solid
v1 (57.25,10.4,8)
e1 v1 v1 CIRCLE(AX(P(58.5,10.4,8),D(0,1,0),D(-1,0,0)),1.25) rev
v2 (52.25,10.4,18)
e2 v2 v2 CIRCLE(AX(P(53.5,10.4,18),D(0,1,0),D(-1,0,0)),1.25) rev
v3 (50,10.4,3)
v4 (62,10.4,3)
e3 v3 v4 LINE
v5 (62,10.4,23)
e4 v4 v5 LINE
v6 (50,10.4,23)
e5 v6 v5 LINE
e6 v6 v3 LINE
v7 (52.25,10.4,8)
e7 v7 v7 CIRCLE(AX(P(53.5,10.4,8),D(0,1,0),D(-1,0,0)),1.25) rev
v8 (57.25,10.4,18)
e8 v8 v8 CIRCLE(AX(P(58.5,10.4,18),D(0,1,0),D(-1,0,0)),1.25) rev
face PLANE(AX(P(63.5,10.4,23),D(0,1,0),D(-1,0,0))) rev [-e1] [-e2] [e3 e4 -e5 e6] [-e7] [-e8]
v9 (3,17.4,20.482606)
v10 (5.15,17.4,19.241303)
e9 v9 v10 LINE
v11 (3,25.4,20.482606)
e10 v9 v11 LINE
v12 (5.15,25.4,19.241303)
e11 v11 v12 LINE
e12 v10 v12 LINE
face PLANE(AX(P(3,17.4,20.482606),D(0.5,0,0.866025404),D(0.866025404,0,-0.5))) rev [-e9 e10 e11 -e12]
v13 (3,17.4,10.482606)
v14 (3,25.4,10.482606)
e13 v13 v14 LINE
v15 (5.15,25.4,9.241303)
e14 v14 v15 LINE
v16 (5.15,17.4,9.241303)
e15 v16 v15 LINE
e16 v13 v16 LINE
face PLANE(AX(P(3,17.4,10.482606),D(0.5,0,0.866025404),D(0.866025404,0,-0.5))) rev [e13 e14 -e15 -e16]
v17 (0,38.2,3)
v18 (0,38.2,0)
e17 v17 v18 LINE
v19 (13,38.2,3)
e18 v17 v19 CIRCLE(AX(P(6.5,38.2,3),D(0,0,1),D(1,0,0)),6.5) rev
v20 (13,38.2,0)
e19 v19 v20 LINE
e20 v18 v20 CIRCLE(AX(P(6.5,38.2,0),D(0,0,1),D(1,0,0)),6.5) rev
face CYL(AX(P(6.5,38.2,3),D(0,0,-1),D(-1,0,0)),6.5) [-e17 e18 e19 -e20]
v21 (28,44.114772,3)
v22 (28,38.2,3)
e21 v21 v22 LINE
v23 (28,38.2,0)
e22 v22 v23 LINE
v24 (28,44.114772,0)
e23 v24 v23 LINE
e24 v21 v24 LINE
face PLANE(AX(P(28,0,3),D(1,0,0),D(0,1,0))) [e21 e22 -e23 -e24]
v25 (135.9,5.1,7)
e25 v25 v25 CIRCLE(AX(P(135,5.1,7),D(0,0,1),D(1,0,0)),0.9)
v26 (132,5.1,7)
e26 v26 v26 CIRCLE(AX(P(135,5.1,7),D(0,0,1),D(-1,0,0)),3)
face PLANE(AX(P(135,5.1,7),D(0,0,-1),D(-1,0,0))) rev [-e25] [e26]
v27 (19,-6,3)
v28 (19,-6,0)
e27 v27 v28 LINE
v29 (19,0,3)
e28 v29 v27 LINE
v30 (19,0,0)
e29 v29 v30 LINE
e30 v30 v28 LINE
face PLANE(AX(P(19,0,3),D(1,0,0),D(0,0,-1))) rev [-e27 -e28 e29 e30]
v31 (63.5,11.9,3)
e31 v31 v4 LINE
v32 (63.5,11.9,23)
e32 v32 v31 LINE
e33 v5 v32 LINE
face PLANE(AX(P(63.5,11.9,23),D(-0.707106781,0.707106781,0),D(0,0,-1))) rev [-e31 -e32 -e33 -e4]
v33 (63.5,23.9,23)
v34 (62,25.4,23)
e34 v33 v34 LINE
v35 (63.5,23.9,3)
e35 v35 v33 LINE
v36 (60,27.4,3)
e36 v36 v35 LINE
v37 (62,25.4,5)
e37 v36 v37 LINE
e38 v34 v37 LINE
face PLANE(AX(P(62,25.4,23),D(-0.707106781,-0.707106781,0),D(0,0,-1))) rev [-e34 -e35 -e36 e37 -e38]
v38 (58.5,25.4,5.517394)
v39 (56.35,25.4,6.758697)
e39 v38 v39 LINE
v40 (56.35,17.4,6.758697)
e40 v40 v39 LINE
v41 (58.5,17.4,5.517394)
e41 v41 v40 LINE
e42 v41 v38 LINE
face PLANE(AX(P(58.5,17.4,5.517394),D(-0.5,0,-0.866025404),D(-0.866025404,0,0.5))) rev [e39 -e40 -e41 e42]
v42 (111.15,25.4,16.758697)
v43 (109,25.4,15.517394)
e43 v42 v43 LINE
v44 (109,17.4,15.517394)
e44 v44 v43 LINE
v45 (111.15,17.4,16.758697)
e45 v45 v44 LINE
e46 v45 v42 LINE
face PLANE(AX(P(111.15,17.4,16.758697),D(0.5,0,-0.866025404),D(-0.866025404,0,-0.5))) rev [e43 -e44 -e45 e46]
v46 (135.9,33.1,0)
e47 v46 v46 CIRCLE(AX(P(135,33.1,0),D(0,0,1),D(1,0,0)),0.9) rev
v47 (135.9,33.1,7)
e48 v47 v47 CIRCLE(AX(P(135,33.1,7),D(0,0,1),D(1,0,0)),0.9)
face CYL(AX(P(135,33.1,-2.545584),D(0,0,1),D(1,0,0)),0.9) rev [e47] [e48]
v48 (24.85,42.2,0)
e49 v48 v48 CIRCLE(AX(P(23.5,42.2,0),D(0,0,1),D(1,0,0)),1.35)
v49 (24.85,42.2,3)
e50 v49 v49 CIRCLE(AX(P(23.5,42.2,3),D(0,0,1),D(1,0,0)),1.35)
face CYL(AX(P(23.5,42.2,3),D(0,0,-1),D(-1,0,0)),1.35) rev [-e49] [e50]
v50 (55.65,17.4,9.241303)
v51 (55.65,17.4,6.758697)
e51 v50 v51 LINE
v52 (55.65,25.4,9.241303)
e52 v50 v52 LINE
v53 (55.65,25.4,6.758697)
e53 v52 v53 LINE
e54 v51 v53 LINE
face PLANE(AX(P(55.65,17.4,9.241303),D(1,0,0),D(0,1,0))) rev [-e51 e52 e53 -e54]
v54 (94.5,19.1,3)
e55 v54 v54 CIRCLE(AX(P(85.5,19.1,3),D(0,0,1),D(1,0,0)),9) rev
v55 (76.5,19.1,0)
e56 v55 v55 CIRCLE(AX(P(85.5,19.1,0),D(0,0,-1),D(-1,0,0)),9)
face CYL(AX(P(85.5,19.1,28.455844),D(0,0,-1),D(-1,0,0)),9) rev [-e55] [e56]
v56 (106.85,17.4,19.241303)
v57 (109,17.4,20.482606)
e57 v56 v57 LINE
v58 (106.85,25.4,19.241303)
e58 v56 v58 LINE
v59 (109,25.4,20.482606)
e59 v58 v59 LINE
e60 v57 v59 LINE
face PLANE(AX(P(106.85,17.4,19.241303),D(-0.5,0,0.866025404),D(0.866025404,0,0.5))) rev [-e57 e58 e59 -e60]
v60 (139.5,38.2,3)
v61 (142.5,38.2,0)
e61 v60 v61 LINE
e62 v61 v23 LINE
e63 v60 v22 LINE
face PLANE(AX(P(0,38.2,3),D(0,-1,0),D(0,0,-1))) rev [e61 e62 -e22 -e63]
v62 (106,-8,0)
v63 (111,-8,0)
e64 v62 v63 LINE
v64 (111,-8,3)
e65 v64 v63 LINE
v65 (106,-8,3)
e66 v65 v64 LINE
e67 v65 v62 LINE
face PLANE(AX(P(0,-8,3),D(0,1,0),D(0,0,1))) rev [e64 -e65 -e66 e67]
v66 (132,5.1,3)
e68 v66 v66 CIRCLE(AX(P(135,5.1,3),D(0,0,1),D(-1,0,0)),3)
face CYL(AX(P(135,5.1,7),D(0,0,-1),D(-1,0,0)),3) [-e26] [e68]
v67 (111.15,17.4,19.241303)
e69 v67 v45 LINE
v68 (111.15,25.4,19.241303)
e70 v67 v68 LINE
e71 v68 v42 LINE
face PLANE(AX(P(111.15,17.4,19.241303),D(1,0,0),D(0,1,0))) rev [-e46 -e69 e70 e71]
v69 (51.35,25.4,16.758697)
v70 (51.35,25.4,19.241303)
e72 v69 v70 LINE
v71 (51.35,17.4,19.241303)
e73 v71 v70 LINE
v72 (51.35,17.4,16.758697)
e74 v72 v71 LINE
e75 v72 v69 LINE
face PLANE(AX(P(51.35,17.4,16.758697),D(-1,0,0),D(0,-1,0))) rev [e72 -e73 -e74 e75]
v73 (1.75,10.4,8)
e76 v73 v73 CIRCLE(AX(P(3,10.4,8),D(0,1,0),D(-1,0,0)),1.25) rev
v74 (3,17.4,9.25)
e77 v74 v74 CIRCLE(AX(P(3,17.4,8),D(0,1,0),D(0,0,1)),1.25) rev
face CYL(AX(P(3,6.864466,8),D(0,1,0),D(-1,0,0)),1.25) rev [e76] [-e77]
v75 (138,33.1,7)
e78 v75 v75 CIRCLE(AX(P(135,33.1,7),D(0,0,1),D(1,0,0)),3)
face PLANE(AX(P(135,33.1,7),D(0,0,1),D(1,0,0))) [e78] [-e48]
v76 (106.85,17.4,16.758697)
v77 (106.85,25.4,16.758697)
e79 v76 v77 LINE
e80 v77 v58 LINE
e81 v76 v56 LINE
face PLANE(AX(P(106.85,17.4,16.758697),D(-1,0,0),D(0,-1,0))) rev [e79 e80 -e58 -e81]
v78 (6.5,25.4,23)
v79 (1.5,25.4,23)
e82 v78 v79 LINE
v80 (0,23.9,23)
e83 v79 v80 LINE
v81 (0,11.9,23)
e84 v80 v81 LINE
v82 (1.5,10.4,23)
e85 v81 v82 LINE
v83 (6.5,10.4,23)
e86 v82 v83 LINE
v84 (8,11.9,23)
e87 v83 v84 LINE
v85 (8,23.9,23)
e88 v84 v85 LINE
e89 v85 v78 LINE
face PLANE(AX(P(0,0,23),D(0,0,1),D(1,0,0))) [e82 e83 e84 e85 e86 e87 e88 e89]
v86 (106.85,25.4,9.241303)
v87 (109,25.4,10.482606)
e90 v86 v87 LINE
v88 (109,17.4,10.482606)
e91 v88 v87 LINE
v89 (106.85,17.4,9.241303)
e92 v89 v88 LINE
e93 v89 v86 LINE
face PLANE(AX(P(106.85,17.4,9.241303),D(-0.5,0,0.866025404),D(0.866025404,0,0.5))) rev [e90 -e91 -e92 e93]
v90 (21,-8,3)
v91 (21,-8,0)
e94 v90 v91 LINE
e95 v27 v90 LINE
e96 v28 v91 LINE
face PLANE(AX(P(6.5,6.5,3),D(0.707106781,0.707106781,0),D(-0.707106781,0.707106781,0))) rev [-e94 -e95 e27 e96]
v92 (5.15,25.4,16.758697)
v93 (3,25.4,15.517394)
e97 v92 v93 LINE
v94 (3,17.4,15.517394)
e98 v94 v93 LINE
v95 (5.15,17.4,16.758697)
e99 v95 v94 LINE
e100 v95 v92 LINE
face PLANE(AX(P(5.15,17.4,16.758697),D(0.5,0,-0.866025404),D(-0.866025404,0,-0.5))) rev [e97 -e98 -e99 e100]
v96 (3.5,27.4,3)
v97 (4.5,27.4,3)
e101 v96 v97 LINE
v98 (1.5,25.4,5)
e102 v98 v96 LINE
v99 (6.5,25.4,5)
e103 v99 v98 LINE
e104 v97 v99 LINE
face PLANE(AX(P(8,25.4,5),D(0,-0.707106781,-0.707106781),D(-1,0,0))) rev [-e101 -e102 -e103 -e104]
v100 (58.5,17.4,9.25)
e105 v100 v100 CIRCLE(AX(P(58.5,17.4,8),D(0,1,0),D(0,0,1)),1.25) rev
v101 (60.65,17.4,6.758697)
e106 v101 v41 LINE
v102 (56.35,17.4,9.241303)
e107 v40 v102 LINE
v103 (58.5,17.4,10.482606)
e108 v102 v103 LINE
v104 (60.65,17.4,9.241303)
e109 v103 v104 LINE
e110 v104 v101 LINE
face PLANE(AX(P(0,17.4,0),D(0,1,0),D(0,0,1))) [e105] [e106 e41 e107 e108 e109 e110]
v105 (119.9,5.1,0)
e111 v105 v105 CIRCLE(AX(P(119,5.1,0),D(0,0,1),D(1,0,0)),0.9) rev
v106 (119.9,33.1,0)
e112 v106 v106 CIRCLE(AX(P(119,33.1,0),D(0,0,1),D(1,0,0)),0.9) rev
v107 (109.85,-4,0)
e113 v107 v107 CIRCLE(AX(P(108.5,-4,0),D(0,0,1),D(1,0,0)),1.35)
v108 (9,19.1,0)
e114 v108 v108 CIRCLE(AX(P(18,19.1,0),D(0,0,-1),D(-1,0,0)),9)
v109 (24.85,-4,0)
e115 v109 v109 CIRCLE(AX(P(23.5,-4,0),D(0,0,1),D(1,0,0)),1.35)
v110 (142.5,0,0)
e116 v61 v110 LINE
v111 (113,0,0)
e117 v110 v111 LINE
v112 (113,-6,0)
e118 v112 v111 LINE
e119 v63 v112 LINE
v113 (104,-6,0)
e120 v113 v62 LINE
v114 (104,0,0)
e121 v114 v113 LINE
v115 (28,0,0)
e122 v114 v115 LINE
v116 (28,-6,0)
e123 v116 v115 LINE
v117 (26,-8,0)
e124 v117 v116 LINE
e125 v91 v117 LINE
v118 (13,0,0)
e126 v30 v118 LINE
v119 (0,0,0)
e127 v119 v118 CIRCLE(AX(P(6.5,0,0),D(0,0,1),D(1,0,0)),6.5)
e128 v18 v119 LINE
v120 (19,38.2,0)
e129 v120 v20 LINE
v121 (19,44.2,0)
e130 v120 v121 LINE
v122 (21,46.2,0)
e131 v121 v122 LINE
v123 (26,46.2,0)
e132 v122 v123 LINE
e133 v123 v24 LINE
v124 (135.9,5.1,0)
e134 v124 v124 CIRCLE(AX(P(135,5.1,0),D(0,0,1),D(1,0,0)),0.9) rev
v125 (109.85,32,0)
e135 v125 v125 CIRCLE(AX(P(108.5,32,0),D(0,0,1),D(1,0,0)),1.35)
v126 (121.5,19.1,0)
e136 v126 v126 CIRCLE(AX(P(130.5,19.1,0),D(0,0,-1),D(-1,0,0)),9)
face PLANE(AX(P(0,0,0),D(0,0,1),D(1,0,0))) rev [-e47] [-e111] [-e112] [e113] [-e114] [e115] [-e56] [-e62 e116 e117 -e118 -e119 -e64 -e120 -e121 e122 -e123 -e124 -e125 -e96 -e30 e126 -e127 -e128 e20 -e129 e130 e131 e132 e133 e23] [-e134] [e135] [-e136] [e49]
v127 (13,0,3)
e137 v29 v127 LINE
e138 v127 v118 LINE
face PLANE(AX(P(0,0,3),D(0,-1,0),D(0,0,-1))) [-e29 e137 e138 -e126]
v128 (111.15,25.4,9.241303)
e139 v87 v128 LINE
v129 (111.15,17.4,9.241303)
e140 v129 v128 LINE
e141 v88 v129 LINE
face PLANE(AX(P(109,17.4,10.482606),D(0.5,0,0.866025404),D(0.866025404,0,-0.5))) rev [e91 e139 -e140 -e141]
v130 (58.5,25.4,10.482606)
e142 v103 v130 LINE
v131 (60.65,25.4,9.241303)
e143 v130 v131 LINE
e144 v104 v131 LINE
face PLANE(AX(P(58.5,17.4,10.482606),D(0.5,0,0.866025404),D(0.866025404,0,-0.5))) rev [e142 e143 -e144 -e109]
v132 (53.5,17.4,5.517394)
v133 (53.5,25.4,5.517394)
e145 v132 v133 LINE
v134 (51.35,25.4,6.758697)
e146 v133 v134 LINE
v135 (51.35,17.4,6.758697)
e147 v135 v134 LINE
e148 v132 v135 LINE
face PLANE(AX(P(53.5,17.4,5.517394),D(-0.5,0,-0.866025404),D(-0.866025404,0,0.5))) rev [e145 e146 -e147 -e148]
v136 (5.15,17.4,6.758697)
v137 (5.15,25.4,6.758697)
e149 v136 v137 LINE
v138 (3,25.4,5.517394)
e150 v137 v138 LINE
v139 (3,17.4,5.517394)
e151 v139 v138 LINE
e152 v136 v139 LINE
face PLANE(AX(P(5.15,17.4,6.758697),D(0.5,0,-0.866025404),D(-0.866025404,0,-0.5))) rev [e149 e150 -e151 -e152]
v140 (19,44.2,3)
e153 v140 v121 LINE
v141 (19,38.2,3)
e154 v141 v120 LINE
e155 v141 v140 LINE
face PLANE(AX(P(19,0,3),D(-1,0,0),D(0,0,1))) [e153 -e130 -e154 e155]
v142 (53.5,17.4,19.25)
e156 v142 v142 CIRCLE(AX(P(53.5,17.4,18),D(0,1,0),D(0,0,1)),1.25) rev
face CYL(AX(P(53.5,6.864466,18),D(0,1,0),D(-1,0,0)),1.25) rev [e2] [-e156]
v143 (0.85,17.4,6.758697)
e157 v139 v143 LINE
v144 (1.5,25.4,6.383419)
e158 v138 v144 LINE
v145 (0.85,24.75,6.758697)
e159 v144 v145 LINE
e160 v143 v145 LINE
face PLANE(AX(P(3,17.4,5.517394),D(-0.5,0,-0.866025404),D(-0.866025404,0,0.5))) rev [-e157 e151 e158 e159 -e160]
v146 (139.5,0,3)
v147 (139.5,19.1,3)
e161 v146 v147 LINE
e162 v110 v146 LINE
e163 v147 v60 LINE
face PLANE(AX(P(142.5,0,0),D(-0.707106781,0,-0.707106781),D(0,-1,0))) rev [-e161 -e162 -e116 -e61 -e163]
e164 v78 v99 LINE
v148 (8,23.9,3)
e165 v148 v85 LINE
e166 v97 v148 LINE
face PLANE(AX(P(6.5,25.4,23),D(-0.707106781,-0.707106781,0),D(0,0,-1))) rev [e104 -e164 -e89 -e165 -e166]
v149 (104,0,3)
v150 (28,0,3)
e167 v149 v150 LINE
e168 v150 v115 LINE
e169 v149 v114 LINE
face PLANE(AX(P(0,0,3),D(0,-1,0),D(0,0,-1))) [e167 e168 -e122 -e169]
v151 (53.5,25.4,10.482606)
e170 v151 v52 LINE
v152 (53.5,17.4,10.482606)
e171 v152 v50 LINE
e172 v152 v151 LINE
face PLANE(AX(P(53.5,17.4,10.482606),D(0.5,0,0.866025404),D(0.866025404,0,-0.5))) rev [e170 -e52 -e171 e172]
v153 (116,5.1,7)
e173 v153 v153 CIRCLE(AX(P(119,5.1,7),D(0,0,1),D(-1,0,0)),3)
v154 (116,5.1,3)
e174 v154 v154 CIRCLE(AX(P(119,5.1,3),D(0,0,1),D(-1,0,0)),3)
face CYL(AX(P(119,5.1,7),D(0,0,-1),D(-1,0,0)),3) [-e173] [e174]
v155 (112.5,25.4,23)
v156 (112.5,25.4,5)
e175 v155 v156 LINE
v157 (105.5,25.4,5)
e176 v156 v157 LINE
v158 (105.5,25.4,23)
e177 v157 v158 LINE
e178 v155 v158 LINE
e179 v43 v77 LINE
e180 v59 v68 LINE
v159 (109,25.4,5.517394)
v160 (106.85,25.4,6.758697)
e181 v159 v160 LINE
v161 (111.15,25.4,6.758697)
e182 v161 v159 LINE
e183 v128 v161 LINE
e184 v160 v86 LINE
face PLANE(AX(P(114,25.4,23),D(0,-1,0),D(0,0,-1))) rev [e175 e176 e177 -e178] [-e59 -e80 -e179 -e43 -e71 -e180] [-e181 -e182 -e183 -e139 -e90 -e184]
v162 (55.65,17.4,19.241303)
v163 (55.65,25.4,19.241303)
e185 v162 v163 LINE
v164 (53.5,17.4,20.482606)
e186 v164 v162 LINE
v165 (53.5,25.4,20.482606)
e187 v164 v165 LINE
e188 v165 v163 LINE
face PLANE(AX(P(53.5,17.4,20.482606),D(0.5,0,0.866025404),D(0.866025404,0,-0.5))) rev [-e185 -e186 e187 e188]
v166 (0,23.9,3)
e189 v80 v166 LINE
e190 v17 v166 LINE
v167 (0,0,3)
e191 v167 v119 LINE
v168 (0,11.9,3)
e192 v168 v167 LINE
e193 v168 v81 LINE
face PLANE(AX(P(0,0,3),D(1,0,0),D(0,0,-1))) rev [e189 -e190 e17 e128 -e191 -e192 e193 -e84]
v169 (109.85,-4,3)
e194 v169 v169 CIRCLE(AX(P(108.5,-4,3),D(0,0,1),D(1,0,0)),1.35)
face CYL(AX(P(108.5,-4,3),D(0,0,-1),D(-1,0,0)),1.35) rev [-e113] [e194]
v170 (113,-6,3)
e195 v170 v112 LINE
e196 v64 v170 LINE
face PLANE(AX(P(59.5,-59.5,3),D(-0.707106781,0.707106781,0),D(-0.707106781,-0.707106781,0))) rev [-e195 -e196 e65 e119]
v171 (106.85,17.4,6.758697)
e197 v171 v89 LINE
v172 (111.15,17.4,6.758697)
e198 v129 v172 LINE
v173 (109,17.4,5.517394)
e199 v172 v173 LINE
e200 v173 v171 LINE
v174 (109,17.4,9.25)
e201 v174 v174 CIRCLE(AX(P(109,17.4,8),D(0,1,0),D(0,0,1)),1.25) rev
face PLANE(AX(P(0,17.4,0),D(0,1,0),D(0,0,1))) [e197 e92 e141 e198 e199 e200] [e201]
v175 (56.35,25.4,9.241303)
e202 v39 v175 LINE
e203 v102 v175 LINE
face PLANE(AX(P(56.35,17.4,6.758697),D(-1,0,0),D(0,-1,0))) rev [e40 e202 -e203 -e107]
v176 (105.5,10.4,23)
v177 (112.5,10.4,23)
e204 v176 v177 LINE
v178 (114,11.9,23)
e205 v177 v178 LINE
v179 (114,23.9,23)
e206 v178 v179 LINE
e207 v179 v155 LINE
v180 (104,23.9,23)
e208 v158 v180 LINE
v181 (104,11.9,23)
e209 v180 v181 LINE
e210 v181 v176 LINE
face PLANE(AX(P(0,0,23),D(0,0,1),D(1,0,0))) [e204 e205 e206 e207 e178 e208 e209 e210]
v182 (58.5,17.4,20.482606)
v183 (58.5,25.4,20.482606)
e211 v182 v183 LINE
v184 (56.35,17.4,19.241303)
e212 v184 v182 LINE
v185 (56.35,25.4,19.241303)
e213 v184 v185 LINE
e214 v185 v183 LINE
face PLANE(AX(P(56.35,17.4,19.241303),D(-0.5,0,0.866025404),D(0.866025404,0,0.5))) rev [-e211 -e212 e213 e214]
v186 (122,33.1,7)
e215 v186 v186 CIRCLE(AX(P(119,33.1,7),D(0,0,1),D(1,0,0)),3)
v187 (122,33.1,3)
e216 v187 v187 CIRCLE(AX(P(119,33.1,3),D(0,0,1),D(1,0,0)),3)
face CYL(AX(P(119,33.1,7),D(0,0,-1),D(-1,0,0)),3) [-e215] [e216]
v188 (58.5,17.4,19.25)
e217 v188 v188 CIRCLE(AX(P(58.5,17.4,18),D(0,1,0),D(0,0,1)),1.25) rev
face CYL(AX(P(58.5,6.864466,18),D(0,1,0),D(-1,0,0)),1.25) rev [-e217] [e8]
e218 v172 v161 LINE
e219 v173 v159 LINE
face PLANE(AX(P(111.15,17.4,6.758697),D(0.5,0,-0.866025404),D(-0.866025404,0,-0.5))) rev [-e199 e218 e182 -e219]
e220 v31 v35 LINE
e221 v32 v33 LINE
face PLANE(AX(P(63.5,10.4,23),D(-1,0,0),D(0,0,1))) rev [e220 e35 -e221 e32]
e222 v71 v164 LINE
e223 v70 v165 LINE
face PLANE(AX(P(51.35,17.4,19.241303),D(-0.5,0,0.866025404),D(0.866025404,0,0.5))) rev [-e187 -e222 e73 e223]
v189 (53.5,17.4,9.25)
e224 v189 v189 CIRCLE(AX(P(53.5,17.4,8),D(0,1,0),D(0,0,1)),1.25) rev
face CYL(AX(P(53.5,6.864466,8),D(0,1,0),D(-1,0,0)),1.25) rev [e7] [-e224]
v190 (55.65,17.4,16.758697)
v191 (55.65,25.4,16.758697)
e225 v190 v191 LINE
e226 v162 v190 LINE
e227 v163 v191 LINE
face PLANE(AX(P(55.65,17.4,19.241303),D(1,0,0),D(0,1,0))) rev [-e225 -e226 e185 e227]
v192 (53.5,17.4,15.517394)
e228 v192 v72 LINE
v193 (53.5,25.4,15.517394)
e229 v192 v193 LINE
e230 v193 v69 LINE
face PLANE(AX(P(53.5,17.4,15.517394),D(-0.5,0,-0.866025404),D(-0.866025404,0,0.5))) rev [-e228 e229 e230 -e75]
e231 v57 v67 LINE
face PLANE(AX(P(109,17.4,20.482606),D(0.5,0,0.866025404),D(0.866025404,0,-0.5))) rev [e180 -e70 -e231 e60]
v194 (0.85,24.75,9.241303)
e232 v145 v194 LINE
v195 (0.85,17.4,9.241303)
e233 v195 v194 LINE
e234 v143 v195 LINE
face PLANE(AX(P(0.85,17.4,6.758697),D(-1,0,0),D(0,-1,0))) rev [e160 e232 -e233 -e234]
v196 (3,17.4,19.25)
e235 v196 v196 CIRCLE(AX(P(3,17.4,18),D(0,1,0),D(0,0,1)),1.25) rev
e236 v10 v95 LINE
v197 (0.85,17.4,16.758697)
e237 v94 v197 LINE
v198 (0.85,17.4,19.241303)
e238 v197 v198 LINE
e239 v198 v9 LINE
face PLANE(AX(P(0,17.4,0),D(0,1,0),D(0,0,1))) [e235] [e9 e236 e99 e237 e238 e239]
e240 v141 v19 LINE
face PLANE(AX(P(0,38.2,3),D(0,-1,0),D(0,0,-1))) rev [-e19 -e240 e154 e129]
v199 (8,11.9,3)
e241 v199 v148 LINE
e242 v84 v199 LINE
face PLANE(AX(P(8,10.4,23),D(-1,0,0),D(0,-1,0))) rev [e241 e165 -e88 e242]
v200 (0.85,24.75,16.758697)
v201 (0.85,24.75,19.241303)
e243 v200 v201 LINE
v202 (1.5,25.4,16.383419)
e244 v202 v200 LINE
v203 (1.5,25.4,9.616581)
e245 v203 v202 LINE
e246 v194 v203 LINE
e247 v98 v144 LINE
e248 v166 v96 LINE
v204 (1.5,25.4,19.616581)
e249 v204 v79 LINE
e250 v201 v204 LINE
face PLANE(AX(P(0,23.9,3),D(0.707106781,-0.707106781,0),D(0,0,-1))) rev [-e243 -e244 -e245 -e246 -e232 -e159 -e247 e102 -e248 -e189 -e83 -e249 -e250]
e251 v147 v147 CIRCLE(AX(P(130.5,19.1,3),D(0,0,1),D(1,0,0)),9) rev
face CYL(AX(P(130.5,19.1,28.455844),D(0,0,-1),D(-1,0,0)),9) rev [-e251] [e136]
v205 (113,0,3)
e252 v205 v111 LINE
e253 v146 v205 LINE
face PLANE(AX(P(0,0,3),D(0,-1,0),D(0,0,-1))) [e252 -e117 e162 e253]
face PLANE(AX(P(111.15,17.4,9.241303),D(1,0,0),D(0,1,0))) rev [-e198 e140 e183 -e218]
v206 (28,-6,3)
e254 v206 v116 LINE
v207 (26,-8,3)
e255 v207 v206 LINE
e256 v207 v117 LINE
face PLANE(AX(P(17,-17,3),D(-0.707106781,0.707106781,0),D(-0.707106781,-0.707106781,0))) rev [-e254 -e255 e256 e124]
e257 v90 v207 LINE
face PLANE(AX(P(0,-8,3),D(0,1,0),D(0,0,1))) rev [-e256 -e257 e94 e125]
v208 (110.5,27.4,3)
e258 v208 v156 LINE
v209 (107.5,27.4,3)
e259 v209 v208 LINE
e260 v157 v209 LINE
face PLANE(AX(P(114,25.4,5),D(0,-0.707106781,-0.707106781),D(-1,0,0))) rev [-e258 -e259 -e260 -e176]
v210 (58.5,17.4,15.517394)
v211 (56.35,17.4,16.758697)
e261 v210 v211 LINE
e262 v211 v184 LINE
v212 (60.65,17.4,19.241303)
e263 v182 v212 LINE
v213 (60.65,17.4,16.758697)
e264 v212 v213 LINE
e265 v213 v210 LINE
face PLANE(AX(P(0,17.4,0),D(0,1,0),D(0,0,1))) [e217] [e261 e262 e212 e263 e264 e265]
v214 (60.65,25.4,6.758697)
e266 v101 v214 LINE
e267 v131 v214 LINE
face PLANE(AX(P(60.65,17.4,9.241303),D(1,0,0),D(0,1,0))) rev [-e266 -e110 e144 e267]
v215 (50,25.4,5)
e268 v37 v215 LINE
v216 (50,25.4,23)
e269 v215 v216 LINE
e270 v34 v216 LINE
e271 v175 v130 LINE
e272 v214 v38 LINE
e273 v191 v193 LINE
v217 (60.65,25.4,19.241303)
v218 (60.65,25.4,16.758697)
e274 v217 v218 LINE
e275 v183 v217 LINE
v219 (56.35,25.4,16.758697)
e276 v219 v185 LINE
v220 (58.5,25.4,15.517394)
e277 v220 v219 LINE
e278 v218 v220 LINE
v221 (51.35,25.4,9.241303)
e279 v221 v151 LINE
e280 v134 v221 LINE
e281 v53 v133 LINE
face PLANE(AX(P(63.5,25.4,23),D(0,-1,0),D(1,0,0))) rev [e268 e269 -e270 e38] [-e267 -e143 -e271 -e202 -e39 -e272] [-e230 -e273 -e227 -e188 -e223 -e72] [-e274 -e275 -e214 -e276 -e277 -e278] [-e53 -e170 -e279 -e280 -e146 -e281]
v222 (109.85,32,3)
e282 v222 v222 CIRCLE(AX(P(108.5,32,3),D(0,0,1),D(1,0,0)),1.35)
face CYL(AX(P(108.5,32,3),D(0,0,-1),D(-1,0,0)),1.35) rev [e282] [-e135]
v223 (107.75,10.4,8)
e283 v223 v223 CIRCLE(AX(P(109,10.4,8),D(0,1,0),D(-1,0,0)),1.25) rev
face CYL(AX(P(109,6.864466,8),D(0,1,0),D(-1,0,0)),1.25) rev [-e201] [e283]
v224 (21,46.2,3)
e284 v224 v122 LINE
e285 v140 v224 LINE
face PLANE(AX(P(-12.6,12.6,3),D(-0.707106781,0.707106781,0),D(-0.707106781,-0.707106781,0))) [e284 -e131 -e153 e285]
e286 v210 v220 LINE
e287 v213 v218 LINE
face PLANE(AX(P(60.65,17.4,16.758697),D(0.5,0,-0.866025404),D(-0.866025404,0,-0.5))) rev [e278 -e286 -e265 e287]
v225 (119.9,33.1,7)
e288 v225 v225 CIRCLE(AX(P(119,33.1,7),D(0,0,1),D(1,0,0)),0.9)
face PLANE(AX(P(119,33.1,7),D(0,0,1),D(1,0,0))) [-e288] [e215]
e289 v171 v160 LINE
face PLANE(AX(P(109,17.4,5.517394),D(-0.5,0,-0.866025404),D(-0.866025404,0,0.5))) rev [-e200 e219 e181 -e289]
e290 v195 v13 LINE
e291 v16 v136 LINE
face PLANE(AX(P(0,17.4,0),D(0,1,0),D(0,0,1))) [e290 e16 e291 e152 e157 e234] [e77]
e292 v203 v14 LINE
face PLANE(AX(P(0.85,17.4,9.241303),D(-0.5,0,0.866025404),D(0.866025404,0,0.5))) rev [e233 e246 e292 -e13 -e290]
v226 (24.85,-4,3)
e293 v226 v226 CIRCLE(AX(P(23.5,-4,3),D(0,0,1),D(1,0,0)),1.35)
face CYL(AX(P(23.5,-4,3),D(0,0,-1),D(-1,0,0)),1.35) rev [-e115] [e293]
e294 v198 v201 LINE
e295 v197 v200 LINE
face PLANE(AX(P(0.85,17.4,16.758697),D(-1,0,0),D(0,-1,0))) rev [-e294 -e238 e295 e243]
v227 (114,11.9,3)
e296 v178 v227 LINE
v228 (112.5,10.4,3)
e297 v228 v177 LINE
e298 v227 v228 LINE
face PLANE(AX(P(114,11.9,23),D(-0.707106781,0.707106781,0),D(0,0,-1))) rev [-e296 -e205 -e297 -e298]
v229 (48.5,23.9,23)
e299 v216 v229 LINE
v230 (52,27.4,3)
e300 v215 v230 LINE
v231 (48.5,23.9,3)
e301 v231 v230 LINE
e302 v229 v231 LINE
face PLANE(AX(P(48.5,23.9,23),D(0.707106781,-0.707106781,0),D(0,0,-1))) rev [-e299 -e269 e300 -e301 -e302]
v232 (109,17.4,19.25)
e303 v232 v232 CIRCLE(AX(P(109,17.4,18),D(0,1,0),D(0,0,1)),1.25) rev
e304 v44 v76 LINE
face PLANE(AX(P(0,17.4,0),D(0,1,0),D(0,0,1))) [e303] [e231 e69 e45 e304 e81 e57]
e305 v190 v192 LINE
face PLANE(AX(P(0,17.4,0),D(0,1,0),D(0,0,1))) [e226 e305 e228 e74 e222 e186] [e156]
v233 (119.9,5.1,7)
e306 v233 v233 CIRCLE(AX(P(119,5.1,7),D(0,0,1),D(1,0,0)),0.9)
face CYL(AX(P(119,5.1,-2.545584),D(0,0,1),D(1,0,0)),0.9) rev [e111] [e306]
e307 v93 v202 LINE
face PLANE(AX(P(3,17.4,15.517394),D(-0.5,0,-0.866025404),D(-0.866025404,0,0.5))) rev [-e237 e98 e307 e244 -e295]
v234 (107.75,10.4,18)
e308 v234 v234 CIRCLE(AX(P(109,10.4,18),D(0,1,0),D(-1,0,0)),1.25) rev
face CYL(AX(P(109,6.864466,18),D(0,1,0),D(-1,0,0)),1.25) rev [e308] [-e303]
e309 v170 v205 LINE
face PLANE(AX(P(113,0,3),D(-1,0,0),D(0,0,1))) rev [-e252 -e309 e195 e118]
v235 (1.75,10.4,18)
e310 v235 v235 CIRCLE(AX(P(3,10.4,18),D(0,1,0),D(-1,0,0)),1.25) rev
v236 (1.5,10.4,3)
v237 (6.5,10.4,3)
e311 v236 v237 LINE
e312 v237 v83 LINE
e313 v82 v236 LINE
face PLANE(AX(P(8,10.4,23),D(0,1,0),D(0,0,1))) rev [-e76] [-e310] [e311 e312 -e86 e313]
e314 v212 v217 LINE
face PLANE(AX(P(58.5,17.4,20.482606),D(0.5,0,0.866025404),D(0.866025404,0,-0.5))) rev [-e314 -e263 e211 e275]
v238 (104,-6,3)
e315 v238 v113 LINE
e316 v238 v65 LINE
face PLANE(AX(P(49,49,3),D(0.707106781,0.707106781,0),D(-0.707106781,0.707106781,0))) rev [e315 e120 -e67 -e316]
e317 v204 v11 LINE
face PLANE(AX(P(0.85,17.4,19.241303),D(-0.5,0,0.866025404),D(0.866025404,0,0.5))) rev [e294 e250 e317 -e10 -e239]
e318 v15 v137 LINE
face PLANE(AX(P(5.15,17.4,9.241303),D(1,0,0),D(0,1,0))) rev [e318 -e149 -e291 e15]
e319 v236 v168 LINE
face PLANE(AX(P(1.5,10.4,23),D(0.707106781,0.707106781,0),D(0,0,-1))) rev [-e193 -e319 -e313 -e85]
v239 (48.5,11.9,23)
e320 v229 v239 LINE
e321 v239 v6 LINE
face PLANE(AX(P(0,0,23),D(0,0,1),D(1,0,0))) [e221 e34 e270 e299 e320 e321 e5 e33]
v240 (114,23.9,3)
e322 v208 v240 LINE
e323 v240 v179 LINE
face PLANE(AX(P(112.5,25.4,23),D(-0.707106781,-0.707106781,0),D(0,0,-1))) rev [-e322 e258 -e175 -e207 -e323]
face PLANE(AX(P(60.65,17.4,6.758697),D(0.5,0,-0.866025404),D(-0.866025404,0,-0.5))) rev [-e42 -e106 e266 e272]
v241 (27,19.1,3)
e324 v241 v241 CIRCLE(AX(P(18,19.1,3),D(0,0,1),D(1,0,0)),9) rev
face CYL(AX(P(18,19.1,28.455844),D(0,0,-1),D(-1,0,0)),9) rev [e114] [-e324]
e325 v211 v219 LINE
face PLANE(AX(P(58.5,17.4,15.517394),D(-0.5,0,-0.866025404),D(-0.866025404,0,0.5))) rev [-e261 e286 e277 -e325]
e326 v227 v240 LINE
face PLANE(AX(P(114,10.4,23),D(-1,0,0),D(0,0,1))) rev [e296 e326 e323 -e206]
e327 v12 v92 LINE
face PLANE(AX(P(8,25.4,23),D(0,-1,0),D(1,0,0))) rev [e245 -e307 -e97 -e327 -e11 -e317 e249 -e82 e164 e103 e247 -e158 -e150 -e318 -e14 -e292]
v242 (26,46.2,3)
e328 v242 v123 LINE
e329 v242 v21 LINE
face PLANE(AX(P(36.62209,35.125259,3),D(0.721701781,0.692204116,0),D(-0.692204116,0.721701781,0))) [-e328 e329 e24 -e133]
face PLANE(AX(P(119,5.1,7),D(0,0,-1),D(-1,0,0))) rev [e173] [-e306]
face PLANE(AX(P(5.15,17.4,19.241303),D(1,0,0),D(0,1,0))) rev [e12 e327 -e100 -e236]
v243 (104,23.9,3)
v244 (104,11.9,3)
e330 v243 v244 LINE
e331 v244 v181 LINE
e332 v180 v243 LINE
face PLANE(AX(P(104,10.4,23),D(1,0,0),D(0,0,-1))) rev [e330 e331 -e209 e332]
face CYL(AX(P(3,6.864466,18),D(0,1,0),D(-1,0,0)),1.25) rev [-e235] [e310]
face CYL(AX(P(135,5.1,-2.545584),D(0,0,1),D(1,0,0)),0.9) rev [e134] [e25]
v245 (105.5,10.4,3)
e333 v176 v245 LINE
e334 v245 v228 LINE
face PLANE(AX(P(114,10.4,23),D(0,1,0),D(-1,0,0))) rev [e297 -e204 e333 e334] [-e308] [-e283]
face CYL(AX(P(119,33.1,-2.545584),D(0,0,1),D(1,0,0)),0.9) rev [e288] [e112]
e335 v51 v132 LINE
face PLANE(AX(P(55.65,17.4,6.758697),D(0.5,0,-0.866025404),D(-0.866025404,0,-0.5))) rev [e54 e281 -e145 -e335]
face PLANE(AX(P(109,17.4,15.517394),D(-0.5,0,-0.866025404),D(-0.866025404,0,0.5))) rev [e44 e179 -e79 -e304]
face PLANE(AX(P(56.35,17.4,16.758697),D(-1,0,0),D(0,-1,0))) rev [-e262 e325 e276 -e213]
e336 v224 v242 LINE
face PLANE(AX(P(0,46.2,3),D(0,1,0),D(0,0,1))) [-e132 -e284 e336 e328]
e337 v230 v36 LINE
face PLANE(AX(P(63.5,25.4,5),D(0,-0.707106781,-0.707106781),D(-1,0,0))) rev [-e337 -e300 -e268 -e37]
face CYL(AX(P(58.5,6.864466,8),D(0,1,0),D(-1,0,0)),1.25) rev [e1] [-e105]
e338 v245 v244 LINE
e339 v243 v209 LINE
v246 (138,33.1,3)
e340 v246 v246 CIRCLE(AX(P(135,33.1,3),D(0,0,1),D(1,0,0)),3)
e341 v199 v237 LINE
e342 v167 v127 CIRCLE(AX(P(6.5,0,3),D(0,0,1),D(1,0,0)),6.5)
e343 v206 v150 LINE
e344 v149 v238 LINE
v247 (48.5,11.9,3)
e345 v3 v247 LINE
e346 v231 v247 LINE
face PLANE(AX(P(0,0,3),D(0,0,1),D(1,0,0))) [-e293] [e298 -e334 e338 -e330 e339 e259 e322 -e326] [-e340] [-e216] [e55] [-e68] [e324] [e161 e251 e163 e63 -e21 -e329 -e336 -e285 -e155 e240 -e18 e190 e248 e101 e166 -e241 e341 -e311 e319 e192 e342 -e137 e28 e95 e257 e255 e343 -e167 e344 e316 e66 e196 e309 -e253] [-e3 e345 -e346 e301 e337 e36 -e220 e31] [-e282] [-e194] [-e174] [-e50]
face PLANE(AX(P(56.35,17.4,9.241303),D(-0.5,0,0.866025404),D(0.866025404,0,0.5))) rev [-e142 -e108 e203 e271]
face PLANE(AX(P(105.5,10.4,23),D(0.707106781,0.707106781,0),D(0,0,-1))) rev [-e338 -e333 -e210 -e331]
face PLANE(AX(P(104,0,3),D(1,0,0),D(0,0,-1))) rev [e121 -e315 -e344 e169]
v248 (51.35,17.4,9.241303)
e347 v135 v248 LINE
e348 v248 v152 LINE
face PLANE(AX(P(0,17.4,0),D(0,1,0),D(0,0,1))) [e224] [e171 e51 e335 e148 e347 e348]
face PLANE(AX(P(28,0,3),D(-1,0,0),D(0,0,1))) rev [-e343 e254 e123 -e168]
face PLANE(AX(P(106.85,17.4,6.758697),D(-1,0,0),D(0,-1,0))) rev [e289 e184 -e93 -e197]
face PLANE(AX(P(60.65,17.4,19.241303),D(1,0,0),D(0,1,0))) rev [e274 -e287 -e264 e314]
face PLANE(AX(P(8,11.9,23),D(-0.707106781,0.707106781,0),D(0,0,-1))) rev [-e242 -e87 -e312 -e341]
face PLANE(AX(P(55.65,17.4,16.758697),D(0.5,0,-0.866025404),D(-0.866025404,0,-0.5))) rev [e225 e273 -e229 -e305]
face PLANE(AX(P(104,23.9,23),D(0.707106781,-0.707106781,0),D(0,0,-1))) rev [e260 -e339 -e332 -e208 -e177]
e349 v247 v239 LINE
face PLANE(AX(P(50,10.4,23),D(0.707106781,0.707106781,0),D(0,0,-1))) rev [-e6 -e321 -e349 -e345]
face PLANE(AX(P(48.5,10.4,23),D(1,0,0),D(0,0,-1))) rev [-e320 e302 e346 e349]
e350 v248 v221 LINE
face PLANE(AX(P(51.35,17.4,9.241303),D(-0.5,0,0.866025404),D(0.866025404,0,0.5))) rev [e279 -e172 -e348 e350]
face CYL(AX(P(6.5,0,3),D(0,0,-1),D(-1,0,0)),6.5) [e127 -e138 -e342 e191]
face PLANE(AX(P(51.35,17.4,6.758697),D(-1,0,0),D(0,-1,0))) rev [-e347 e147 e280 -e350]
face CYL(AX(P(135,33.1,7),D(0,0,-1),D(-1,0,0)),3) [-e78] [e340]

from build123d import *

# Parameters (mm, degrees)
SKETCH1_R           = 1.35
BOSS_EXTRUDE1_DEPTH = 3
CHAMFER1_SIZE       = 3
SKETCH3_W           = 10
SKETCH3_H           = 15
SKETCH3_W_2         = 15
SKETCH3_W_3         = 8
BOSS_EXTRUDE2_DEPTH = 20
SKETCH4_R           = 1.25
CUT_EXTRUDE1_DEPTH  = 15
CHAMFER2_SIZE       = 1.5
CUT_EXTRUDE2_DEPTH  = 8
SKETCH2_R           = 9
CUT_EXTRUDE3_DEPTH  = 3
SKETCH6_R           = 3
BOSS_EXTRUDE3_DEPTH = 4
SKETCH7_R           = 0.9
CUT_EXTRUDE4_DEPTH  = 7
CHAMFER3_SIZE       = 2


with BuildPart() as part:
    # Sketch1 → Boss-Extrude1 (new body)
    with BuildSketch(Plane.XY):
        with BuildLine():
            Line((19, 44.2), (19, 38.2))
            Line((19, 38.2), (13, 38.2))
            ThreePointArc((13, 38.2), (6.5, 44.7), (0, 38.2))
            Line((0, 38.2), (0, 0))
            ThreePointArc((0, 0), (6.5, -6.5), (13, 0))
            Line((13, 0), (19, 0))
            Line((19, 0), (19, -6))
            Line((19, -6), (21, -8))
            Line((21, -8), (26, -8))
            Line((26, -8), (28, -6))
            Line((28, -6), (28, 0))
            Line((28, 0), (104, 0))
            Line((104, 0), (104, -6))
            Line((104, -6), (106, -8))
            Line((106, -8), (111, -8))
            Line((111, -8), (113, -6))
            Line((113, -6), (113, 0))
            Line((113, 0), (142.5, 0))
            Line((142.5, 0), (142.5, 38.2))
            Line((142.5, 38.2), (28, 38.2))
            Line((28, 38.2), (28, 44.114771772))
            Line((28, 44.114771772), (26, 46.2))
            Line((26, 46.2), (21, 46.2))
            Line((21, 46.2), (19, 44.2))
        make_face()
        with Locations((23.5, 42.2)):
            Circle(SKETCH1_R, mode=Mode.SUBTRACT)
        with Locations((108.5, 32)):
            Circle(SKETCH1_R, mode=Mode.SUBTRACT)
        with Locations((108.5, -4)):
            Circle(SKETCH1_R, mode=Mode.SUBTRACT)
        with Locations((23.5, -4)):
            Circle(SKETCH1_R, mode=Mode.SUBTRACT)
    extrude(amount=BOSS_EXTRUDE1_DEPTH)

    # Chamfer1
    chamfer1_edges = [part.edges().sort_by_distance(p)[0] for p in [
        (142.5, 19.1, 3),
    ]]
    chamfer(chamfer1_edges, length=CHAMFER1_SIZE - 0.0001)  # a hair under: the kernel refuses the full size

    # Sketch3 → Boss-Extrude2 (add)
    with BuildSketch(Plane.XY.offset(3)):
        with Locations((109, 17.9)):
            Rectangle(SKETCH3_W, SKETCH3_H)
        with Locations((56, 17.9)):
            Rectangle(SKETCH3_W_2, SKETCH3_H)
        with Locations((4, 17.9)):
            Rectangle(SKETCH3_W_3, SKETCH3_H)
    extrude(amount=BOSS_EXTRUDE2_DEPTH)

    # Sketch4 → Cut-Extrude1 (cut)
    with BuildSketch(Plane(origin=(0, 25.4, 0), x_dir=(1, 0, 0), z_dir=(0, 1, 0))):
        with Locations(Location((58.5, -18, 0), (0, 0, 180))):
            Circle(SKETCH4_R)
        with Locations(Location((53.5, -18, 0), (0, 0, 180))):
            Circle(SKETCH4_R)
        with Locations(Location((53.5, -8, 0), (0, 0, 180))):
            Circle(SKETCH4_R)
        with Locations(Location((58.5, -8, 0), (0, 0, 180))):
            Circle(SKETCH4_R)
        with Locations(Location((109, -18, 0), (0, 0, 180))):
            Circle(SKETCH4_R)
        with Locations(Location((3, -18, 0), (0, 0, 180))):
            Circle(SKETCH4_R)
        with Locations(Location((3, -8, 0), (0, 0, 180))):
            Circle(SKETCH4_R)
        with Locations(Location((109, -8, 0), (0, 0, 180))):
            Circle(SKETCH4_R)
    extrude(amount=-CUT_EXTRUDE1_DEPTH, mode=Mode.SUBTRACT)

    # Chamfer2
    chamfer2_edges = [part.edges().sort_by_distance(p)[0] for p in [
        (114, 10.4, 13),
        (114, 25.4, 13),
        (104, 25.4, 13),
        (104, 10.4, 13),
        (63.5, 10.4, 13),
        (63.5, 25.4, 13),
        (48.5, 25.4, 13),
        (48.5, 10.4, 13),
        (8, 10.4, 13),
        (8, 25.4, 13),
        (0, 25.4, 13),
        (0, 10.4, 13),
    ]]
    chamfer(chamfer2_edges, length=CHAMFER2_SIZE)

    # Sketch5 → Cut-Extrude2 (cut)
    with BuildSketch(Plane(origin=(0, 25.4, 0), x_dir=(1, 0, 0), z_dir=(0, 1, 0))):
        Polygon((3, -5.517393842), (0.85, -6.758696921), (0.85, -9.241303079), (3, -10.482606158), (5.15, -9.241303079), (5.15, -6.758696921), align=None)
        Polygon((3, -15.517393842), (0.85, -16.758696921), (0.85, -19.241303079), (3, -20.482606158), (5.15, -19.241303079), (5.15, -16.758696921), align=None)
        Polygon((53.5, -5.517393842), (51.35, -6.758696921), (51.35, -9.241303079), (53.5, -10.482606158), (55.65, -9.241303079), (55.65, -6.758696921), align=None)
        Polygon((58.5, -5.517393842), (56.35, -6.758696921), (56.35, -9.241303079), (58.5, -10.482606158), (60.65, -9.241303079), (60.65, -6.758696921), align=None)
        Polygon((58.5, -15.517393842), (56.35, -16.758696921), (56.35, -19.241303079), (58.5, -20.482606158), (60.65, -19.241303079), (60.65, -16.758696921), align=None)
        Polygon((53.5, -15.517393842), (51.35, -16.758696921), (51.35, -19.241303079), (53.5, -20.482606158), (55.65, -19.241303079), (55.65, -16.758696921), align=None)
        Polygon((109, -15.517393842), (106.85, -16.758696921), (106.85, -19.241303079), (109, -20.482606158), (111.15, -19.241303079), (111.15, -16.758696921), align=None)
        Polygon((109, -5.517393842), (106.85, -6.758696921), (106.85, -9.241303079), (109, -10.482606158), (111.15, -9.241303079), (111.15, -6.758696921), align=None)
    extrude(amount=-CUT_EXTRUDE2_DEPTH, mode=Mode.SUBTRACT)

    # Sketch2 → Cut-Extrude3 (cut)
    with BuildSketch(Plane(origin=(0, 0, 0), x_dir=(-1, 0, 0), z_dir=(0, 0, -1))):
        with Locations((-18, 19.1)):
            Circle(SKETCH2_R)
        with Locations((-85.5, 19.1)):
            Circle(SKETCH2_R)
        with Locations((-130.5, 19.1)):
            Circle(SKETCH2_R)
    extrude(amount=-CUT_EXTRUDE3_DEPTH, mode=Mode.SUBTRACT)

    # Sketch6 → Boss-Extrude3 (add)
    with BuildSketch(Plane.XY.offset(3)):
        with Locations((119, 33.1)):
            Circle(SKETCH6_R)
        with Locations((135, 33.1)):
            Circle(SKETCH6_R)
        with Locations(Location((135, 5.1, 0), (0, 0, 180))):
            Circle(SKETCH6_R)
        with Locations(Location((119, 5.1, 0), (0, 0, 180))):
            Circle(SKETCH6_R)
    extrude(amount=BOSS_EXTRUDE3_DEPTH)

    # Sketch7 → Cut-Extrude4 (cut)
    with BuildSketch(Plane.XY.offset(7)):
        with Locations((135, 33.1)):
            Circle(SKETCH7_R)
        with Locations((119, 33.1)):
            Circle(SKETCH7_R)
        with Locations((119, 5.1)):
            Circle(SKETCH7_R)
        with Locations((135, 5.1)):
            Circle(SKETCH7_R)
    extrude(amount=-CUT_EXTRUDE4_DEPTH, mode=Mode.SUBTRACT)

    # Chamfer3
    chamfer3_edges = [part.edges().sort_by_distance(p)[0] for p in [
        (56, 25.4, 3),
        (4, 25.4, 3),
        (109, 25.4, 3),
    ]]
    chamfer(chamfer3_edges, length=CHAMFER3_SIZE)


solid = part.part
